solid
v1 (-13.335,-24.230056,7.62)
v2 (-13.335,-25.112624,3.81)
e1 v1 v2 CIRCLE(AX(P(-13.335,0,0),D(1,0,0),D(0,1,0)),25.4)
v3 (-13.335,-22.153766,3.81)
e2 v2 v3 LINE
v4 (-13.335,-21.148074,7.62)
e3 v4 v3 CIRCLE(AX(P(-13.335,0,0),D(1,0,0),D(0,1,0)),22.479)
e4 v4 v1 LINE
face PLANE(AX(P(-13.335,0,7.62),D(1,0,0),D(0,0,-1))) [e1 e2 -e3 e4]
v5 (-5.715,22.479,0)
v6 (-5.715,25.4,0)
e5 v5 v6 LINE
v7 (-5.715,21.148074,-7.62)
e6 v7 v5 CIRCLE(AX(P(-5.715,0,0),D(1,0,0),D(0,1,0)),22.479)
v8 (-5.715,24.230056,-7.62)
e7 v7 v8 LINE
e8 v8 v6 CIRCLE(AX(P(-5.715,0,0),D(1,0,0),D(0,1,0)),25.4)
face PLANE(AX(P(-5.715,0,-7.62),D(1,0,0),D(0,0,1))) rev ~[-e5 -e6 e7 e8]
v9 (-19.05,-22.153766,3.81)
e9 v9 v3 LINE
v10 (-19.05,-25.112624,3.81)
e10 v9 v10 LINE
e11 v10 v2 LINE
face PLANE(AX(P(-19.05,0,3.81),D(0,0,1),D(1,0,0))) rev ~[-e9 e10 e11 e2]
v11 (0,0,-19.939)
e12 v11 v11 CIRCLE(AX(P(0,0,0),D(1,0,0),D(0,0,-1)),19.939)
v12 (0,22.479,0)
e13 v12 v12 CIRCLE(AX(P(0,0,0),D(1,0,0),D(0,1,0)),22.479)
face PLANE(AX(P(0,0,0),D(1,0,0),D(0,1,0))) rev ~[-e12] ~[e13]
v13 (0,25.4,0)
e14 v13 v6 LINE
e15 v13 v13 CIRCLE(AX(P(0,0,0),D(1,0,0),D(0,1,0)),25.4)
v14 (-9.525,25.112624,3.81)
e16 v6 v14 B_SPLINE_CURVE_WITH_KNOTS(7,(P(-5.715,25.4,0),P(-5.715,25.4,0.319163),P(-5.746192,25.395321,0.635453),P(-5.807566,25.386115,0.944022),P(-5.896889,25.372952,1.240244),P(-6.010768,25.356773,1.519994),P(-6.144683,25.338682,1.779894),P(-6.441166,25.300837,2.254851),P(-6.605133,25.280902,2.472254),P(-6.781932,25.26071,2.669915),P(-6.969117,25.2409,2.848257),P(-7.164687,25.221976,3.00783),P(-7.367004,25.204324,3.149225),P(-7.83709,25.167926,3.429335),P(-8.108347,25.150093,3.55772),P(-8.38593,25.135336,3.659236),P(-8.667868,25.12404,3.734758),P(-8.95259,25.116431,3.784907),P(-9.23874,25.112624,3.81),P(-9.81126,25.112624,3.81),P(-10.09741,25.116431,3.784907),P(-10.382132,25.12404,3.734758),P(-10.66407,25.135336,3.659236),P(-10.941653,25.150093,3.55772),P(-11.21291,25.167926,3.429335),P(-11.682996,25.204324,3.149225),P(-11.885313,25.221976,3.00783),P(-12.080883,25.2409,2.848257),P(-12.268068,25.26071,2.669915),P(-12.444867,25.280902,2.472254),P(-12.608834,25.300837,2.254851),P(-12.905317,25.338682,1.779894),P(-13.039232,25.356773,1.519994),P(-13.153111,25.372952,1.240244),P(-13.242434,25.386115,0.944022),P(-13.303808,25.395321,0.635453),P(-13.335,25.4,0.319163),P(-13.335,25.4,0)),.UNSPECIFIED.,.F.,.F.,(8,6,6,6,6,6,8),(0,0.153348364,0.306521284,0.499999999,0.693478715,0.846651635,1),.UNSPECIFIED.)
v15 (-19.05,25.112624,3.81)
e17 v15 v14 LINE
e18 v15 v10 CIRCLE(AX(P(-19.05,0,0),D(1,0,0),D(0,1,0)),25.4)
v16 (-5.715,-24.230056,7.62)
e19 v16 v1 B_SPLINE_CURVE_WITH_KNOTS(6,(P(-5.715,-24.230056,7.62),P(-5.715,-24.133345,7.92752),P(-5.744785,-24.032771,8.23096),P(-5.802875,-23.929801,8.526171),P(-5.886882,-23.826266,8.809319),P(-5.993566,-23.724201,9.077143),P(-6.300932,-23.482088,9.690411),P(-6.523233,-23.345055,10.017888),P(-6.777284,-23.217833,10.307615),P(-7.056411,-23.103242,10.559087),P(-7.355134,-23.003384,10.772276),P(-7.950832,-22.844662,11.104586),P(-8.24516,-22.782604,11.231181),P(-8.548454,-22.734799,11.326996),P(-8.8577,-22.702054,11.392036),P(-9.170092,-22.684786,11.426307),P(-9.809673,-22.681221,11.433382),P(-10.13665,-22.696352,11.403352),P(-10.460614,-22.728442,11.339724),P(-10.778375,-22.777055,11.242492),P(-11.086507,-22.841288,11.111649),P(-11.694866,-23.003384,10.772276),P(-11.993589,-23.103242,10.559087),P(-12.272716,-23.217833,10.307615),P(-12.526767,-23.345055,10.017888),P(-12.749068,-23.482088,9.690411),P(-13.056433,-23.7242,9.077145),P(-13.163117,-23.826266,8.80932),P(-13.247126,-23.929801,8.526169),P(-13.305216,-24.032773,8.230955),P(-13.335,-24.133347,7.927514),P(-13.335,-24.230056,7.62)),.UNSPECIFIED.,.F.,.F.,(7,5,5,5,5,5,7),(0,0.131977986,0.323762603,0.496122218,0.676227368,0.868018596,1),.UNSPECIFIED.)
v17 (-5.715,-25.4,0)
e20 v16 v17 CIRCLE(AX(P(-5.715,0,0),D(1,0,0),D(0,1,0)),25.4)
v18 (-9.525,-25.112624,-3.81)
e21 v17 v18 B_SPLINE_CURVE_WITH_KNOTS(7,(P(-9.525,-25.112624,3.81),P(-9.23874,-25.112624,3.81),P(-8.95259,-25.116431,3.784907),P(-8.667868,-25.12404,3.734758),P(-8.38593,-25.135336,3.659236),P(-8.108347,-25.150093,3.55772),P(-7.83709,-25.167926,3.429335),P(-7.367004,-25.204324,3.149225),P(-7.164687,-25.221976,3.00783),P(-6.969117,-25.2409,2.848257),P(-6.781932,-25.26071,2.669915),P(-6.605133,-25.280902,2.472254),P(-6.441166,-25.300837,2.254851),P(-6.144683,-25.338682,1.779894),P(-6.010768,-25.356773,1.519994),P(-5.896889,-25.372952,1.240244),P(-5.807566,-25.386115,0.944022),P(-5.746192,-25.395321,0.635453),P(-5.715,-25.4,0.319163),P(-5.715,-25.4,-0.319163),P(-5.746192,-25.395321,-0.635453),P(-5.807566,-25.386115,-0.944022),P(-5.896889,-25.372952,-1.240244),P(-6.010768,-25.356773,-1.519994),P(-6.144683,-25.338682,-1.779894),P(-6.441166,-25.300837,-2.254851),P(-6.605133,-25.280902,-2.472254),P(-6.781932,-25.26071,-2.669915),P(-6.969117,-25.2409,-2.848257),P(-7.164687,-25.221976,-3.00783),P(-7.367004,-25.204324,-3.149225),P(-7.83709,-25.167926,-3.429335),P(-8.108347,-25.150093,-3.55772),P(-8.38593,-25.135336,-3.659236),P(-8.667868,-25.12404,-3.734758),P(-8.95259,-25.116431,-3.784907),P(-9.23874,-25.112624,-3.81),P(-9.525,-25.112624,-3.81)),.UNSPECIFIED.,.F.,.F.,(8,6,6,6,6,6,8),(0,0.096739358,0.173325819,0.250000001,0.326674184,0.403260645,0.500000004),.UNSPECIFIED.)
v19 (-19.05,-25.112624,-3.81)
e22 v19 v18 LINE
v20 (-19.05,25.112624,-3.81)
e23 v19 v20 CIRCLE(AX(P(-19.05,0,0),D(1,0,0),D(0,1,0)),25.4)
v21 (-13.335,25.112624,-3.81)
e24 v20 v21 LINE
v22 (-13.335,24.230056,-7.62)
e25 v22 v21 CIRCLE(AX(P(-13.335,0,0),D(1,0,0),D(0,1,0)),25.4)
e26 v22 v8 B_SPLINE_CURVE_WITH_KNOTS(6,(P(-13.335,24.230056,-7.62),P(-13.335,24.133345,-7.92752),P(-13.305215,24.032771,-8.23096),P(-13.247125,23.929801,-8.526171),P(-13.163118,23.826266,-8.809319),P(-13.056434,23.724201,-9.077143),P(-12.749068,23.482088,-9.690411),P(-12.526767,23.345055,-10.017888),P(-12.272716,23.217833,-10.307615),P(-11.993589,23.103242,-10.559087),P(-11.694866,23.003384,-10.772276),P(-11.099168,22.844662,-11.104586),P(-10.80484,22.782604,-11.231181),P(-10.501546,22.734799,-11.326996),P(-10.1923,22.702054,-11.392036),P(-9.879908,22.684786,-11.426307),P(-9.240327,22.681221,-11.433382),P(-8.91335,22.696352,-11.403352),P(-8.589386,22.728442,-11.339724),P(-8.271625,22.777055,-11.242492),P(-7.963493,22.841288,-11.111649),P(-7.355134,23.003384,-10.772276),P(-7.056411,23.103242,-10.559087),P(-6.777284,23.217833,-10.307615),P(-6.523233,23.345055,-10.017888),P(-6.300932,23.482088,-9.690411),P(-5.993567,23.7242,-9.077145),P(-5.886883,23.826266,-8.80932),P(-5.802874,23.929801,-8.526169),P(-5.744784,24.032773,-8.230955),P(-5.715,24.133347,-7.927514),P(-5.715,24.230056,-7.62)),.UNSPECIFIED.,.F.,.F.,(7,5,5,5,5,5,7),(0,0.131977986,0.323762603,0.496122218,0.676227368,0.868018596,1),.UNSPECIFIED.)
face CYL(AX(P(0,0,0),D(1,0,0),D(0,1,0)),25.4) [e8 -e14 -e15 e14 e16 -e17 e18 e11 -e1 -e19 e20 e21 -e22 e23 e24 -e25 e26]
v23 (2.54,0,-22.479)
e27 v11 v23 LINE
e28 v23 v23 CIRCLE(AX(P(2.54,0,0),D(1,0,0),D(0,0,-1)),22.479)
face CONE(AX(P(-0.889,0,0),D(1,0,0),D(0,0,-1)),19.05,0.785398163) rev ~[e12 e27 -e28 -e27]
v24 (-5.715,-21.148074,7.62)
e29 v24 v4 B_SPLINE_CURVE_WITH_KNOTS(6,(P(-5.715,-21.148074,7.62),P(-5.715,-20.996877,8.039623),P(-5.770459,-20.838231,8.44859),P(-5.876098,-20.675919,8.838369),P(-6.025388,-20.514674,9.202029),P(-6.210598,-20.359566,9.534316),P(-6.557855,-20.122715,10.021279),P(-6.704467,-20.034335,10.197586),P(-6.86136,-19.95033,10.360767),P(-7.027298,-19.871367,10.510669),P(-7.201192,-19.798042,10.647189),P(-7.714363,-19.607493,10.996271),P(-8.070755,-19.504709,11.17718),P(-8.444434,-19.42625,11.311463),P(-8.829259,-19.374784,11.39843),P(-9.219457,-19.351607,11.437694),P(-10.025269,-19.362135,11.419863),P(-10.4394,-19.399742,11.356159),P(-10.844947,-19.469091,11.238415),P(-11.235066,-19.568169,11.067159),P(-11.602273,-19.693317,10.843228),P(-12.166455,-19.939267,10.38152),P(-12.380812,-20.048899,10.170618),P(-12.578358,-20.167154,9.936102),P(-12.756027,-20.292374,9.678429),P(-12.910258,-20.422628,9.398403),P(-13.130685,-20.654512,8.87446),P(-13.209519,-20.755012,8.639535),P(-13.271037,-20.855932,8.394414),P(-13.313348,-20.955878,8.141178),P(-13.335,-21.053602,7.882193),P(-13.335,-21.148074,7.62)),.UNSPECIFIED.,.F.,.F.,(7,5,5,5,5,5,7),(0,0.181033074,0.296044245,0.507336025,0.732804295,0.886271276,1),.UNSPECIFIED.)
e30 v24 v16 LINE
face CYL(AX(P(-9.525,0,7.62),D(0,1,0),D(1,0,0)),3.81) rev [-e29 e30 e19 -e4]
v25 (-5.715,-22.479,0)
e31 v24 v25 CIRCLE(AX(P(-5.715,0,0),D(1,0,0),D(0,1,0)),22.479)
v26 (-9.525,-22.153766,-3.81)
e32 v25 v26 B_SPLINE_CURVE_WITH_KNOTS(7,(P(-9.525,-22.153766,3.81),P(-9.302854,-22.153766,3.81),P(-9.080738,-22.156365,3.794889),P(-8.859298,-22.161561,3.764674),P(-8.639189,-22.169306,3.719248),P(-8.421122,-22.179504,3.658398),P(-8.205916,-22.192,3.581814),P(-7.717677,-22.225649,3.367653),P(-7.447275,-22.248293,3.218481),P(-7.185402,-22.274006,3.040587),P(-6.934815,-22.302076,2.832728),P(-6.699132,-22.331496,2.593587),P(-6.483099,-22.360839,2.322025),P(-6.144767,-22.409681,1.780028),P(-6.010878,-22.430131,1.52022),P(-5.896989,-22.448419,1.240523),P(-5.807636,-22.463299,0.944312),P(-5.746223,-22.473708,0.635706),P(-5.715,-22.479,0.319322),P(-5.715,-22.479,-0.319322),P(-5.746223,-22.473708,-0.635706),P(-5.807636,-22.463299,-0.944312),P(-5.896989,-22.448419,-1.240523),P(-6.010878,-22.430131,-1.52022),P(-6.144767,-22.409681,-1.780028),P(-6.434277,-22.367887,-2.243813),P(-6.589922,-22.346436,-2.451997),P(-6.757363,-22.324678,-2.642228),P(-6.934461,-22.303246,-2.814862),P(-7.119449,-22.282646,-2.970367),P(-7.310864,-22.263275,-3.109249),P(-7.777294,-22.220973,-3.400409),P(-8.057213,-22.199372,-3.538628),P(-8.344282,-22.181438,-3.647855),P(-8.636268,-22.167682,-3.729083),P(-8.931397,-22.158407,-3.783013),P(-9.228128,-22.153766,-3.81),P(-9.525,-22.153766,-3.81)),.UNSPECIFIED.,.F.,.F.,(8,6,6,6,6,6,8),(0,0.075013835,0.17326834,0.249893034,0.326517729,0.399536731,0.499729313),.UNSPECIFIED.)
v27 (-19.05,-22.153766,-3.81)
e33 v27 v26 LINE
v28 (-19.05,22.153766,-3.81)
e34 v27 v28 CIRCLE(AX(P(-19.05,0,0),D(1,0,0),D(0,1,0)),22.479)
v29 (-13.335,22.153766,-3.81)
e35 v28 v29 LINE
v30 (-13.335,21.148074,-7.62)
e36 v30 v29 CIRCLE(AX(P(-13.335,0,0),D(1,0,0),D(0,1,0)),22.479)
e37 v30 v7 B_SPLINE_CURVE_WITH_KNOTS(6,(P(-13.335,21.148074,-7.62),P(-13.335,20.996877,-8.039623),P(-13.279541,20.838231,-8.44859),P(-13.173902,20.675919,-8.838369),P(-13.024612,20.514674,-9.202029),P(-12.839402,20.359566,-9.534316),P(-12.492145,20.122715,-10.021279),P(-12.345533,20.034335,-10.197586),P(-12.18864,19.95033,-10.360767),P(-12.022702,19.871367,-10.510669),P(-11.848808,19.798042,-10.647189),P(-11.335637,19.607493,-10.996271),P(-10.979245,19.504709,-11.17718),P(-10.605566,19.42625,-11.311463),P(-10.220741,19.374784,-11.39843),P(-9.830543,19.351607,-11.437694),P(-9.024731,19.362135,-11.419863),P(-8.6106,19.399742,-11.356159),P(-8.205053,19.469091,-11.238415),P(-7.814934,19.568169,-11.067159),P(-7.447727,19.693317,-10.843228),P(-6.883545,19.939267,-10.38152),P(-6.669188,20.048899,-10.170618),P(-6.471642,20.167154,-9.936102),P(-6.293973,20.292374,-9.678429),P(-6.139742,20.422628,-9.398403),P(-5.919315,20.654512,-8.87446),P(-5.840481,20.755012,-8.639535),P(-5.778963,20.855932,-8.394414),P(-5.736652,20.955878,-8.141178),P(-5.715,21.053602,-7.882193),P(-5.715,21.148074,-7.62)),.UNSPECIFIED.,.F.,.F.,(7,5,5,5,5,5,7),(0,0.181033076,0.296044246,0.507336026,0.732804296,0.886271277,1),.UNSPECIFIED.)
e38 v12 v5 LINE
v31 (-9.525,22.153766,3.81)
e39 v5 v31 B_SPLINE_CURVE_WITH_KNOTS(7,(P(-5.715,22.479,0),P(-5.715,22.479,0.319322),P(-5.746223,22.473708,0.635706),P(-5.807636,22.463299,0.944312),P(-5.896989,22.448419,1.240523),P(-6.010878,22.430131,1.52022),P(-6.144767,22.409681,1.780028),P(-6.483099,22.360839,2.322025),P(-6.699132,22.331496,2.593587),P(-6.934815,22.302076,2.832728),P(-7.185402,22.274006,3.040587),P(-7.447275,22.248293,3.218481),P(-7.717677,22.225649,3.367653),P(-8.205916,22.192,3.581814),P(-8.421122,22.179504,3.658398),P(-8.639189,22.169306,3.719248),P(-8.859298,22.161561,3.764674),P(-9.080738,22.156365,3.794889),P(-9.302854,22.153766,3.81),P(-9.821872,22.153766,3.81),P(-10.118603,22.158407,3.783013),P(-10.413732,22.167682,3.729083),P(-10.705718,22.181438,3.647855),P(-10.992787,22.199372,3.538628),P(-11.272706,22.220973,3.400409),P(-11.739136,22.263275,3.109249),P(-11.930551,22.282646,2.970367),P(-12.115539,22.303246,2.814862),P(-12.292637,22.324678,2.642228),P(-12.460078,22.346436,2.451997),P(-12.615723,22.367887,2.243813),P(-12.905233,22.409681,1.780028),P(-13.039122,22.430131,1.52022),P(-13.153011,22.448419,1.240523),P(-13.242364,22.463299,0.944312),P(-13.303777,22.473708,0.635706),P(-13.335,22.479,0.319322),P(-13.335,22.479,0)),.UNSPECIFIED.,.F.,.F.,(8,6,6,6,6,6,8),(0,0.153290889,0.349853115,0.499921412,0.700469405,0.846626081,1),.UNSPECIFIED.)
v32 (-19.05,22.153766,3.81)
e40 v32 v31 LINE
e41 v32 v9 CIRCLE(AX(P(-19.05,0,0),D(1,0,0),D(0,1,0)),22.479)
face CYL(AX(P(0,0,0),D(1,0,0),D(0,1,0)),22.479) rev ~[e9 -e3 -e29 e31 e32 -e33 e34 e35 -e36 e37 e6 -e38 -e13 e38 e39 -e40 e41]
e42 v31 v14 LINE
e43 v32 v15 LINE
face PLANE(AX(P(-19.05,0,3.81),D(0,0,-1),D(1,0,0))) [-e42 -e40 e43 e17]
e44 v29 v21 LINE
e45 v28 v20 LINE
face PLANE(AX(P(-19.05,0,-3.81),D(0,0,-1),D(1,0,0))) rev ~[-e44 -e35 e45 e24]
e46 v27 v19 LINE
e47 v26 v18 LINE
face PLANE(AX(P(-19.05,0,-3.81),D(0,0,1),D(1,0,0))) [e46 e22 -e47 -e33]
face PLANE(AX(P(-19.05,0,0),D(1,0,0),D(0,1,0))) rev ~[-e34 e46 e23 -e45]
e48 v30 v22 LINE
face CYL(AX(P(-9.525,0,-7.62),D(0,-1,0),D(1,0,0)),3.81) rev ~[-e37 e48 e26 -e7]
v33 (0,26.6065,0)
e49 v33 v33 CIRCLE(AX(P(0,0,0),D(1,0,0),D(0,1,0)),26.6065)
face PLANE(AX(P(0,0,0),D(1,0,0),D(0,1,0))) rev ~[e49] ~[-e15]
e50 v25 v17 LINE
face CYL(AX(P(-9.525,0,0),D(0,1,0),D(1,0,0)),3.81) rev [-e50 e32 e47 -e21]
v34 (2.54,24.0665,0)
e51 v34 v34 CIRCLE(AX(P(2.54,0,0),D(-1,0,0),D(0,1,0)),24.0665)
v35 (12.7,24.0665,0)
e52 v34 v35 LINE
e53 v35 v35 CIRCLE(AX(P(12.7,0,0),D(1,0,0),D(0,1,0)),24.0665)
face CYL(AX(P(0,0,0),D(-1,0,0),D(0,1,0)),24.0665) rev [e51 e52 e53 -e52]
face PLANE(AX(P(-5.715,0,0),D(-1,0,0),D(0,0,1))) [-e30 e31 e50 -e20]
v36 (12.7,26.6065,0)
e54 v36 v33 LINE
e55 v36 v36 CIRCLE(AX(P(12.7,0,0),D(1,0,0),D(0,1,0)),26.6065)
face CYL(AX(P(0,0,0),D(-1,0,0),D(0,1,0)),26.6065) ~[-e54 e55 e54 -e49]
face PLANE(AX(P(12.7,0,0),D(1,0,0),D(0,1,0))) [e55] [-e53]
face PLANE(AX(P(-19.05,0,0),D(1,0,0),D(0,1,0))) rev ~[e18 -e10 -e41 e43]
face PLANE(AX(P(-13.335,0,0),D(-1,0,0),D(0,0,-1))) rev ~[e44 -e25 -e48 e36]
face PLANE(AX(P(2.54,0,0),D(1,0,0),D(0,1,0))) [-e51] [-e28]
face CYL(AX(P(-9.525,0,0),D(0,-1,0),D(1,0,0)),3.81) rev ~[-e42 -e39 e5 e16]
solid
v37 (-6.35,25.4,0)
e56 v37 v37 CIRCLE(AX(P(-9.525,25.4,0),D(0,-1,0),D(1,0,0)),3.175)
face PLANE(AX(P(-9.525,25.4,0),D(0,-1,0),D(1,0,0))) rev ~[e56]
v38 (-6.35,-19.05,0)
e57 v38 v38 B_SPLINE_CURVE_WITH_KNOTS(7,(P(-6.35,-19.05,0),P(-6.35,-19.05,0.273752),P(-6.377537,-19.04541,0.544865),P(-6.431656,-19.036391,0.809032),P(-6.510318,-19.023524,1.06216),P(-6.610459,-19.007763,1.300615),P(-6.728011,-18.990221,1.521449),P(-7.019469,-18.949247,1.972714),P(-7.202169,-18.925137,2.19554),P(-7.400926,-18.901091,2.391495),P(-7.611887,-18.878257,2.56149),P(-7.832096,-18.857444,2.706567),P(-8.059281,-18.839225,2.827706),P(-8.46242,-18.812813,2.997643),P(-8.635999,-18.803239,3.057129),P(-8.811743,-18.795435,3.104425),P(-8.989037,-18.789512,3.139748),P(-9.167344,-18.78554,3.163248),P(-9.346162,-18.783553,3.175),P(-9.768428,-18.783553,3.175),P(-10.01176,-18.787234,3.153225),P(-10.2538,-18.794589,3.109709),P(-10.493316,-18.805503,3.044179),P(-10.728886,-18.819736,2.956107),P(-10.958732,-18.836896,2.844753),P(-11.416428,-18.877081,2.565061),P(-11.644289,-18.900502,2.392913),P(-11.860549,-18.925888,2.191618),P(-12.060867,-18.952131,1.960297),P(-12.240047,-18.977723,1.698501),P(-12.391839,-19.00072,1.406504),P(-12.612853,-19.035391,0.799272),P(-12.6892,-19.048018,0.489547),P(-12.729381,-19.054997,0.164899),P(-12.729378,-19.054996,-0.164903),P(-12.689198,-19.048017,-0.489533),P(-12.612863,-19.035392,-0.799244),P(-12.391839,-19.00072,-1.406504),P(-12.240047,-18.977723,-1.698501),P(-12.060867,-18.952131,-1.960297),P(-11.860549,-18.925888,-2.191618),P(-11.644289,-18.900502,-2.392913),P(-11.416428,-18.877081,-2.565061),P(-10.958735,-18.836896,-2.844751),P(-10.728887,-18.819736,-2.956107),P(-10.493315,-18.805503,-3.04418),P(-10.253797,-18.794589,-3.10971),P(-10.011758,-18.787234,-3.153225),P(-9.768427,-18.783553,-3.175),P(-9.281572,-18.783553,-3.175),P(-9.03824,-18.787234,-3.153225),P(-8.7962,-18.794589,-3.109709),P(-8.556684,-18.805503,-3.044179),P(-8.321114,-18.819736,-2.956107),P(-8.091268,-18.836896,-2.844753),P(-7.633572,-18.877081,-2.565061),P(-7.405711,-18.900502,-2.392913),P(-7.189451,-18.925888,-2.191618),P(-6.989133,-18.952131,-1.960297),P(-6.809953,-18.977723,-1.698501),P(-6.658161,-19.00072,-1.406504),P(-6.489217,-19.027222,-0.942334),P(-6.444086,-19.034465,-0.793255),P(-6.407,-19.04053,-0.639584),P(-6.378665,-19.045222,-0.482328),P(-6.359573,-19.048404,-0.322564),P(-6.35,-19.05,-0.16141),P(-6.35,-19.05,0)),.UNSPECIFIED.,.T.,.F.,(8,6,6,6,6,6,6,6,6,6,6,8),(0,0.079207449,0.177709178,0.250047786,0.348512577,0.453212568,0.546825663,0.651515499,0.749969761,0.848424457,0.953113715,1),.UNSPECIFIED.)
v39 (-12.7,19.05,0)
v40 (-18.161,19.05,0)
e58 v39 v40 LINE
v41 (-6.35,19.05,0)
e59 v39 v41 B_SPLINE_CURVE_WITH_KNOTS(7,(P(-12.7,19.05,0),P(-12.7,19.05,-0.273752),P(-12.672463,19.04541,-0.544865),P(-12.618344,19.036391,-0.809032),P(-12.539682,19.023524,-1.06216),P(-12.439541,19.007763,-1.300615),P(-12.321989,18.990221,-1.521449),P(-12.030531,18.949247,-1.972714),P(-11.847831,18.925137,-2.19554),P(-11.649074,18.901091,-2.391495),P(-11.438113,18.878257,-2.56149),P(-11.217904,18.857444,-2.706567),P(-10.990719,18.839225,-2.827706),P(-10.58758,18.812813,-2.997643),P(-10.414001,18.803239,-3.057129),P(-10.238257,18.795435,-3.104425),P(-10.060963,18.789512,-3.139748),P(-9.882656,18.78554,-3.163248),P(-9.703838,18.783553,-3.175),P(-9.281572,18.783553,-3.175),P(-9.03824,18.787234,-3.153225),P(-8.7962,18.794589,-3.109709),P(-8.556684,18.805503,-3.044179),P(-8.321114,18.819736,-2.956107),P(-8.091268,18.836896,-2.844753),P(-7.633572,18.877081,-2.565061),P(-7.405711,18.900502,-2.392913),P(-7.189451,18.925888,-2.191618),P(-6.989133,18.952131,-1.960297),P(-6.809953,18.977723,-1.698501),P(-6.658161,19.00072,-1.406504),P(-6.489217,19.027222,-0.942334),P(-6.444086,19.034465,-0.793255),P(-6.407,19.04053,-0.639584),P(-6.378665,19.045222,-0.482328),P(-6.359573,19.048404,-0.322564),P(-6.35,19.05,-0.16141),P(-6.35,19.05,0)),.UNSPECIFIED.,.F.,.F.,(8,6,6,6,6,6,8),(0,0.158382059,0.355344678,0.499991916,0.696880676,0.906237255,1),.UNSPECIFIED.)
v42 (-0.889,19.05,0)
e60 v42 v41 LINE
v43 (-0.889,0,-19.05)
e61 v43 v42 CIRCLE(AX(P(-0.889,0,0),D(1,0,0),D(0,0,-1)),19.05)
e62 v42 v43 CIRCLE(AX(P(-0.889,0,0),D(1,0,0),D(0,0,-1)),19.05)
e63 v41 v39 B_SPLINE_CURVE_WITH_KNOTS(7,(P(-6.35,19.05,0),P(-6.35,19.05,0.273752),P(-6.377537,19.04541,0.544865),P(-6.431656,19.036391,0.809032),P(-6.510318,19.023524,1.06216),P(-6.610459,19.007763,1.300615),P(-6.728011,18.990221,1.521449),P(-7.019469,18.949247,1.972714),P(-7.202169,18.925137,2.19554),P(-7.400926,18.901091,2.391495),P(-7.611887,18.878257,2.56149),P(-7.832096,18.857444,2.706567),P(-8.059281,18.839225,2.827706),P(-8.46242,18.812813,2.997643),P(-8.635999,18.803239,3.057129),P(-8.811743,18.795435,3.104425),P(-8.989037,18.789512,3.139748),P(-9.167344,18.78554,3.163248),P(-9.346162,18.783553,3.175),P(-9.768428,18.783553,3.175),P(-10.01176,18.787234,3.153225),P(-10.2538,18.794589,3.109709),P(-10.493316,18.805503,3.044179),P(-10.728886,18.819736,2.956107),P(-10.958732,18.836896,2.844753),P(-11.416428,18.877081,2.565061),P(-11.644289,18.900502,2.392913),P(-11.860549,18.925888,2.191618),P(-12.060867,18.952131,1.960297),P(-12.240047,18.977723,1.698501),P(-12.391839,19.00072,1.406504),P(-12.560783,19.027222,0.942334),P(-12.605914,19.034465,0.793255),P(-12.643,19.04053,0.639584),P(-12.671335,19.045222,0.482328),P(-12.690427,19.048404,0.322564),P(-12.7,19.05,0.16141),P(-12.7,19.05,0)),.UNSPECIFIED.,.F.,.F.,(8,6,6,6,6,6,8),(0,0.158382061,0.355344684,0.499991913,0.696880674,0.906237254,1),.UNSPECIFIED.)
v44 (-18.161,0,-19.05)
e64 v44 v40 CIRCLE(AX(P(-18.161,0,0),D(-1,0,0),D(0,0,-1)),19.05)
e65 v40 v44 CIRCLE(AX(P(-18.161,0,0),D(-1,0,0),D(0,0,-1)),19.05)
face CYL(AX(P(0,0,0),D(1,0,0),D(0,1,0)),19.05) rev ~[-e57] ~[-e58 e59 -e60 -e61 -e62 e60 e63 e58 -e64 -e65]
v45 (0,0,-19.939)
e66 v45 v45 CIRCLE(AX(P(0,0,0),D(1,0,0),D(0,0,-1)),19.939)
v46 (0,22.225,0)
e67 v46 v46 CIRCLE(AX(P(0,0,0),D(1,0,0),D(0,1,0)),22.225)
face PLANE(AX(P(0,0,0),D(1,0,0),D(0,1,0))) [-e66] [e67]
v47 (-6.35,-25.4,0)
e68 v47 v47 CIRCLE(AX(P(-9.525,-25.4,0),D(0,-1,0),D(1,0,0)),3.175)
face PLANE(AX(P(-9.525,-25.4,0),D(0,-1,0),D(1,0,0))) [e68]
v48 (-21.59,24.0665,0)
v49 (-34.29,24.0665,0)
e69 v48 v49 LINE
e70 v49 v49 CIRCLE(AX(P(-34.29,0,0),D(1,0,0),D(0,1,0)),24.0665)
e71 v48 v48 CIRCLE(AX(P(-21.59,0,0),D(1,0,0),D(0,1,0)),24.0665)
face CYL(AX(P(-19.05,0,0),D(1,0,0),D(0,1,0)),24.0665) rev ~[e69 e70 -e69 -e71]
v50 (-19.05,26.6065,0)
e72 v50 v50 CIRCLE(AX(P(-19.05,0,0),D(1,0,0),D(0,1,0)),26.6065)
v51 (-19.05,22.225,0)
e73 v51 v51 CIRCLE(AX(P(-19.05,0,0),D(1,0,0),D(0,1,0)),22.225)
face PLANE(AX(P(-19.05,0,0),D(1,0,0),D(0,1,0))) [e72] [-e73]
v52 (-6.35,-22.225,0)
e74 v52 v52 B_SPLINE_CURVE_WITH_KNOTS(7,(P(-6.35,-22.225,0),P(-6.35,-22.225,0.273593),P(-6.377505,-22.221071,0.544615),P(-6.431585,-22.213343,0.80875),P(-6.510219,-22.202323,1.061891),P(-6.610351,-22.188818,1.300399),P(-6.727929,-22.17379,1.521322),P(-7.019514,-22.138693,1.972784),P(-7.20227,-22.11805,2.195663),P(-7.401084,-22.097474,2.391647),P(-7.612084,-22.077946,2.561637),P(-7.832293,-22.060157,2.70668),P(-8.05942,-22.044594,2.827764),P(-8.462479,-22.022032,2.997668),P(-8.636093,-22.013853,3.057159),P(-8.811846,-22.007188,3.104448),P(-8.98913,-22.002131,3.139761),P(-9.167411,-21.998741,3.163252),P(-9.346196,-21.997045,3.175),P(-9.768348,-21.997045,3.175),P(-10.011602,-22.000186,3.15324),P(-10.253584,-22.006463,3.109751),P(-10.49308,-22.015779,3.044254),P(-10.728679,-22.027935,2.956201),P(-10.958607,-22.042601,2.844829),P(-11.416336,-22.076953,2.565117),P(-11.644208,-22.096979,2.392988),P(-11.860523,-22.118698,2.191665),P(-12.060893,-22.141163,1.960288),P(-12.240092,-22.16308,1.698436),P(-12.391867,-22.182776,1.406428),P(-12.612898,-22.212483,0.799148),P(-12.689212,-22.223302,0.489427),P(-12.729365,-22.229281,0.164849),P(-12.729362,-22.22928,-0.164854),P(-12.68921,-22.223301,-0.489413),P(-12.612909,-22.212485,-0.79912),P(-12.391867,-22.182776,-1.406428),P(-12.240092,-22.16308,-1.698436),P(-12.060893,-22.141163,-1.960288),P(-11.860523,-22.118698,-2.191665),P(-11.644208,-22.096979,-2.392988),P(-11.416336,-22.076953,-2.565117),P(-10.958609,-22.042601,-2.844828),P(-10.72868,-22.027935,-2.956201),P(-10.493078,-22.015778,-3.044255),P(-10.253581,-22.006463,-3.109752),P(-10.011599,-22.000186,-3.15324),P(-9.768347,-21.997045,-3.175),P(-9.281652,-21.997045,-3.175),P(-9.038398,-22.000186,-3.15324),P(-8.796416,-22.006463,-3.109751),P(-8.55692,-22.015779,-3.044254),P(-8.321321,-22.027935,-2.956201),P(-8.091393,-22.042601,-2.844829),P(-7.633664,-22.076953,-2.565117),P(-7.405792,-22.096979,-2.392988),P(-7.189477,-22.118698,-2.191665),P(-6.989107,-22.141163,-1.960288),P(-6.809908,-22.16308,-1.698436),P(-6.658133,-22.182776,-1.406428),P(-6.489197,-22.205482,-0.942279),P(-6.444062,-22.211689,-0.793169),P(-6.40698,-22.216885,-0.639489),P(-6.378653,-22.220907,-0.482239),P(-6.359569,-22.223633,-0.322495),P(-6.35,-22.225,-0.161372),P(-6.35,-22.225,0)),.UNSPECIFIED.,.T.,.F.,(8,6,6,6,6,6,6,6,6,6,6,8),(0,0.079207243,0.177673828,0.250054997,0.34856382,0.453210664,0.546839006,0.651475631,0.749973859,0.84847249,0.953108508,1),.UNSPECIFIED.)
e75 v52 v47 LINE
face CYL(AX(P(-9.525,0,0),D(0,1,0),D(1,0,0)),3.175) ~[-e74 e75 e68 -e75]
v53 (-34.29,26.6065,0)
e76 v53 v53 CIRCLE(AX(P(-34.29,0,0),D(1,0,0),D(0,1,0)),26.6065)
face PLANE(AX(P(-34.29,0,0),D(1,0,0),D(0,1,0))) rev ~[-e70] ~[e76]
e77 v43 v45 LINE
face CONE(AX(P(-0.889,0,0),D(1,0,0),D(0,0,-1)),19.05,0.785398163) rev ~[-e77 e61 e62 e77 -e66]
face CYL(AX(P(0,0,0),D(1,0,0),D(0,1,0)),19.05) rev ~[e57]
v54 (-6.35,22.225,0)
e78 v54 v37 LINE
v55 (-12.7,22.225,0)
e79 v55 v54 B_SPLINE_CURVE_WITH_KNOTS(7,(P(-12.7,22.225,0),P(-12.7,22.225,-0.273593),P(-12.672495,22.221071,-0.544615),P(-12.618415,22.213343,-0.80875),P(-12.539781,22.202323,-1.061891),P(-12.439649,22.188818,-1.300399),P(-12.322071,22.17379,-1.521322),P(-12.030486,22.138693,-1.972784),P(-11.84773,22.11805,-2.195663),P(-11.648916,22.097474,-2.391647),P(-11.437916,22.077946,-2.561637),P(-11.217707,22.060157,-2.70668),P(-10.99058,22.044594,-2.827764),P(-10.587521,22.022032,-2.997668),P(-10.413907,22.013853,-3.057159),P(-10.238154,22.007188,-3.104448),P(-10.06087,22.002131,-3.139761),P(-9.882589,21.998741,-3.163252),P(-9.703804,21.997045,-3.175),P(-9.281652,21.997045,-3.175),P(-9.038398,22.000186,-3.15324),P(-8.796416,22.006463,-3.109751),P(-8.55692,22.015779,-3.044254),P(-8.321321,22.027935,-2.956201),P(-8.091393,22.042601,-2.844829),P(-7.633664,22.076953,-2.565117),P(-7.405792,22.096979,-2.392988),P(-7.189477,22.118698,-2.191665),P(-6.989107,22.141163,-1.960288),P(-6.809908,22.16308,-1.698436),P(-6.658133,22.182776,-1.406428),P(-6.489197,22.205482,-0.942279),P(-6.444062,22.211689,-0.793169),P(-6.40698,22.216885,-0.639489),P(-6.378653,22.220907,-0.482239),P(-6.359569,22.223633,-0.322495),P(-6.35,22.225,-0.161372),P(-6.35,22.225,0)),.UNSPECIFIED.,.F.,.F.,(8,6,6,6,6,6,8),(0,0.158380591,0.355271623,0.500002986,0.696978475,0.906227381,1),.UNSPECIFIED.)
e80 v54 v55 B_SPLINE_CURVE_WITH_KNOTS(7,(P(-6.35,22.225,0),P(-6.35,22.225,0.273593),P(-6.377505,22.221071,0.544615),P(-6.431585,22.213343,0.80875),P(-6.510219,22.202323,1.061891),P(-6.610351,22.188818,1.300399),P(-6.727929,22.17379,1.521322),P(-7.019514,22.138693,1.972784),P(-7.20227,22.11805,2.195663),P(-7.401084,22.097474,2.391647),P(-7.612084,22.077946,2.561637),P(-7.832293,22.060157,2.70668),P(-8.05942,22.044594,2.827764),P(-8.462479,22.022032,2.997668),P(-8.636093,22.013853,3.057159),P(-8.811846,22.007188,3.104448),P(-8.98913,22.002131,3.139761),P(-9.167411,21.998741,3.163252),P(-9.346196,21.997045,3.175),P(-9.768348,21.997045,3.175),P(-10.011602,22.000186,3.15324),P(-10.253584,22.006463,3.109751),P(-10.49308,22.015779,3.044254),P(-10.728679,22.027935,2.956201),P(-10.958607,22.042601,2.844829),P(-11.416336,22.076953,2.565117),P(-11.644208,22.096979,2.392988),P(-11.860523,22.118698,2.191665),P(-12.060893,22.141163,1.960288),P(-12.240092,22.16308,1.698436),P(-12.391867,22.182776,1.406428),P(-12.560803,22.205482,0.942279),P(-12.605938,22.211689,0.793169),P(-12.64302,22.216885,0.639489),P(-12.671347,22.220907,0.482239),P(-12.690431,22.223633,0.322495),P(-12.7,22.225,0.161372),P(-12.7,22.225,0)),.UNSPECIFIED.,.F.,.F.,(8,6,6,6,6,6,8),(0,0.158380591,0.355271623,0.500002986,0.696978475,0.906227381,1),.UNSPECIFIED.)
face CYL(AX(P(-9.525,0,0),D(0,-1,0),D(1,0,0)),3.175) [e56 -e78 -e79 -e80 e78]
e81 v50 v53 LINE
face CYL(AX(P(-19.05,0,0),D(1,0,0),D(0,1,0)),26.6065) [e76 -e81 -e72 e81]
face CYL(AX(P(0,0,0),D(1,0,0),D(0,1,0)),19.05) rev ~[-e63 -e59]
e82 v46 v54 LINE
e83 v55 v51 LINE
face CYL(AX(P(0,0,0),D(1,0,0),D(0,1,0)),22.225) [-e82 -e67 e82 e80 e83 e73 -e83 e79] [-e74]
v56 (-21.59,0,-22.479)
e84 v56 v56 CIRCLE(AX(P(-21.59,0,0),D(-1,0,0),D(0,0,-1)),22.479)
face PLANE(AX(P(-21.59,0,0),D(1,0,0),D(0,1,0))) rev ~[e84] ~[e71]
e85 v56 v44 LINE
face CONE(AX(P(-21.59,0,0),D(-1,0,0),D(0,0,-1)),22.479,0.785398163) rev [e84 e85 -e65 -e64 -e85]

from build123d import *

# Parameters (mm, degrees)
F0_R           = 26.6065
F0_R_2         = 24.0665
F0_R_3         = 19.05
F1_DEPTH       = 2.54
F2_DEPTH       = 12.7
F3_R           = 25.4
F3_R_2         = 22.479
F4_DEPTH       = 19.05
F5_W           = 9.525
F5_H           = 7.62
F6_DEPTH       = 50.8
F6_DEPTH_BACK  = 50.8
F7_R           = 3.81
F8_DEPTH       = 50.8
F8_DEPTH_BACK  = 50.8
F10_DEPTH      = 50.8
F12_DEPTH      = 25.4
F13_R          = 22.225
F13_R_2        = 19.05
F14_DEPTH      = 21.59
F15_START      = -19.05
F13_R_3        = 24.0665
F15_DEPTH      = 2.54
F17_START      = -19.05
F16_R          = 26.6065
F16_R_2        = 24.0665
F17_DEPTH      = 15.24
F18_R          = 3.175
F19_DEPTH      = 25.4
F19_DEPTH_BACK = 25.4
F20_DEPTH      = 25.4
F21_W          = 2.54
F21_H          = 0.889


with BuildPart() as f1:
    # F0 (on Right) → F1 (new body)
    with BuildSketch(Plane.YZ):
        Circle(F0_R)
        Circle(F0_R_2, mode=Mode.SUBTRACT)
        Circle(F0_R_2)
        Circle(F0_R_3, mode=Mode.SUBTRACT)
    extrude(amount=F1_DEPTH)

    # F0 (on Right) → F2 (join)
    with BuildSketch(Plane.YZ):
        Circle(F0_R)
        Circle(F0_R_2, mode=Mode.SUBTRACT)
    extrude(amount=F2_DEPTH)

    # F3 (on Right) → F4 (join)
    with BuildSketch(Plane.YZ):
        Circle(F3_R)
        Circle(F3_R_2, mode=Mode.SUBTRACT)
    extrude(amount=-F4_DEPTH)

    # F5 (on Front) → F6 (cut, two sides)
    with BuildSketch(Plane.XZ) as f6_sk:
        with Locations((-14.2875, 0)):
            Rectangle(F5_W, F5_H)
    extrude(amount=-F6_DEPTH, mode=Mode.SUBTRACT)
    extrude(f6_sk.sketch, amount=F6_DEPTH_BACK, mode=Mode.SUBTRACT)

    # F7 (on Front) → F8 (cut, two sides)
    with BuildSketch(Plane.XZ) as f8_sk:
        with Locations((-9.525, 0)):
            Circle(F7_R)
    extrude(amount=-F8_DEPTH, mode=Mode.SUBTRACT)
    extrude(f8_sk.sketch, amount=F8_DEPTH_BACK, mode=Mode.SUBTRACT)

    # F9 (on Front) → F10 (cut)
    with BuildSketch(Plane.XZ):
        with BuildLine():
            ThreePointArc((-13.335, 7.62), (-9.525, 3.81), (-5.715, 7.62))
            ThreePointArc((-5.715, 7.62), (-9.525, 11.43), (-13.335, 7.62))
        make_face()
        with BuildLine():
            Line((-5.715, 0), (-5.715, 7.62))
            ThreePointArc((-5.715, 7.62), (-9.525, 3.81), (-13.335, 7.62))
            Line((-13.335, 7.62), (-13.335, 0))
            Line((-13.335, 0), (-5.715, 0))
        make_face()
    extrude(amount=F10_DEPTH, mode=Mode.SUBTRACT)

    # F11 (on Front) → F12 (cut)
    with BuildSketch(Plane.XZ):
        with BuildLine():
            ThreePointArc((-13.335, -7.62), (-9.525, -3.81), (-5.715, -7.62))
            Line((-5.715, -7.62), (-5.715, 0))
            Line((-5.715, 0), (-13.335, 0))
            Line((-13.335, 0), (-13.335, -7.62))
        make_face()
        with BuildLine():
            ThreePointArc((-13.335, -7.62), (-9.525, -11.43), (-5.715, -7.62))
            ThreePointArc((-5.715, -7.62), (-9.525, -3.81), (-13.335, -7.62))
        make_face()
    extrude(amount=-F12_DEPTH, mode=Mode.SUBTRACT)


with BuildPart() as f14:
    # F13 (on Right) → F14 (new body)
    with BuildSketch(Plane.YZ):
        Circle(F13_R)
        Circle(F13_R_2, mode=Mode.SUBTRACT)
    extrude(amount=-F14_DEPTH)

    # F13 (on Right) → F15 (join)
    with BuildSketch(Plane.YZ.offset(F15_START)):
        Circle(F13_R_3)
        Circle(F13_R, mode=Mode.SUBTRACT)
    extrude(amount=-F15_DEPTH)

    # F16 (on Right) → F17 (join)
    with BuildSketch(Plane.YZ.offset(F17_START)):
        Circle(F16_R)
        Circle(F16_R_2, mode=Mode.SUBTRACT)
    extrude(amount=-F17_DEPTH)

    # F18 (on Front) → F19 (join, two sides)
    with BuildSketch(Plane.XZ) as f19_sk:
        with Locations((-9.525, 0)):
            Circle(F18_R)
    extrude(amount=F19_DEPTH)
    extrude(f19_sk.sketch, amount=-F19_DEPTH_BACK)

    # F13 (on Right) → F20 (cut)
    with BuildSketch(Plane.YZ):
        Circle(F13_R_2)
    extrude(amount=-F20_DEPTH, mode=Mode.SUBTRACT)


with BuildPart() as f22_tool:
    # F21 (on Front) → F22 (revolve)
    with BuildSketch(Plane.XZ):
        Polygon((0, -19.939), (2.54, -22.479), (2.54, -19.939), align=None)
        with Locations((1.27, -19.4945)):
            Rectangle(F21_W, F21_H)
        Polygon((-0.889, -19.05), (0, -19.939), (0, -19.05), align=None)
    revolve(axis=Axis((12.2344479781, 0, 0), (1, 0, 0)))


with BuildPart() as f1_1:
    add(f1.part)

    # F22: cut by f22_tool
    add(f22_tool.part, mode=Mode.SUBTRACT)

    # F21 (on Front) → F25 (revolve, cut)
    with BuildSketch(Plane.XZ):
        Polygon((0, -19.939), (2.54, -22.479), (2.54, -19.939), align=None)
        with Locations((1.27, -19.4945)):
            Rectangle(F21_W, F21_H)
        Polygon((-0.889, -19.05), (0, -19.939), (0, -19.05), align=None)
    revolve(axis=Axis((12.2344479781, 0, 0), (1, 0, 0)), mode=Mode.SUBTRACT)


with BuildPart() as f14_1:
    add(f14.part)

    # F22: cut by f22_tool
    add(f22_tool.part, mode=Mode.SUBTRACT)

    # F23 (on Front) → F24 (revolve, cut)
    with BuildSketch(Plane.XZ):
        Polygon((-18.161, -19.05), (-21.59, -19.05), (-21.59, -22.479), align=None)
    revolve(axis=Axis((-10.795, 0, 0), (-1, 0, 0)), mode=Mode.SUBTRACT)


solid = Compound([f1_1.part, f14_1.part])
